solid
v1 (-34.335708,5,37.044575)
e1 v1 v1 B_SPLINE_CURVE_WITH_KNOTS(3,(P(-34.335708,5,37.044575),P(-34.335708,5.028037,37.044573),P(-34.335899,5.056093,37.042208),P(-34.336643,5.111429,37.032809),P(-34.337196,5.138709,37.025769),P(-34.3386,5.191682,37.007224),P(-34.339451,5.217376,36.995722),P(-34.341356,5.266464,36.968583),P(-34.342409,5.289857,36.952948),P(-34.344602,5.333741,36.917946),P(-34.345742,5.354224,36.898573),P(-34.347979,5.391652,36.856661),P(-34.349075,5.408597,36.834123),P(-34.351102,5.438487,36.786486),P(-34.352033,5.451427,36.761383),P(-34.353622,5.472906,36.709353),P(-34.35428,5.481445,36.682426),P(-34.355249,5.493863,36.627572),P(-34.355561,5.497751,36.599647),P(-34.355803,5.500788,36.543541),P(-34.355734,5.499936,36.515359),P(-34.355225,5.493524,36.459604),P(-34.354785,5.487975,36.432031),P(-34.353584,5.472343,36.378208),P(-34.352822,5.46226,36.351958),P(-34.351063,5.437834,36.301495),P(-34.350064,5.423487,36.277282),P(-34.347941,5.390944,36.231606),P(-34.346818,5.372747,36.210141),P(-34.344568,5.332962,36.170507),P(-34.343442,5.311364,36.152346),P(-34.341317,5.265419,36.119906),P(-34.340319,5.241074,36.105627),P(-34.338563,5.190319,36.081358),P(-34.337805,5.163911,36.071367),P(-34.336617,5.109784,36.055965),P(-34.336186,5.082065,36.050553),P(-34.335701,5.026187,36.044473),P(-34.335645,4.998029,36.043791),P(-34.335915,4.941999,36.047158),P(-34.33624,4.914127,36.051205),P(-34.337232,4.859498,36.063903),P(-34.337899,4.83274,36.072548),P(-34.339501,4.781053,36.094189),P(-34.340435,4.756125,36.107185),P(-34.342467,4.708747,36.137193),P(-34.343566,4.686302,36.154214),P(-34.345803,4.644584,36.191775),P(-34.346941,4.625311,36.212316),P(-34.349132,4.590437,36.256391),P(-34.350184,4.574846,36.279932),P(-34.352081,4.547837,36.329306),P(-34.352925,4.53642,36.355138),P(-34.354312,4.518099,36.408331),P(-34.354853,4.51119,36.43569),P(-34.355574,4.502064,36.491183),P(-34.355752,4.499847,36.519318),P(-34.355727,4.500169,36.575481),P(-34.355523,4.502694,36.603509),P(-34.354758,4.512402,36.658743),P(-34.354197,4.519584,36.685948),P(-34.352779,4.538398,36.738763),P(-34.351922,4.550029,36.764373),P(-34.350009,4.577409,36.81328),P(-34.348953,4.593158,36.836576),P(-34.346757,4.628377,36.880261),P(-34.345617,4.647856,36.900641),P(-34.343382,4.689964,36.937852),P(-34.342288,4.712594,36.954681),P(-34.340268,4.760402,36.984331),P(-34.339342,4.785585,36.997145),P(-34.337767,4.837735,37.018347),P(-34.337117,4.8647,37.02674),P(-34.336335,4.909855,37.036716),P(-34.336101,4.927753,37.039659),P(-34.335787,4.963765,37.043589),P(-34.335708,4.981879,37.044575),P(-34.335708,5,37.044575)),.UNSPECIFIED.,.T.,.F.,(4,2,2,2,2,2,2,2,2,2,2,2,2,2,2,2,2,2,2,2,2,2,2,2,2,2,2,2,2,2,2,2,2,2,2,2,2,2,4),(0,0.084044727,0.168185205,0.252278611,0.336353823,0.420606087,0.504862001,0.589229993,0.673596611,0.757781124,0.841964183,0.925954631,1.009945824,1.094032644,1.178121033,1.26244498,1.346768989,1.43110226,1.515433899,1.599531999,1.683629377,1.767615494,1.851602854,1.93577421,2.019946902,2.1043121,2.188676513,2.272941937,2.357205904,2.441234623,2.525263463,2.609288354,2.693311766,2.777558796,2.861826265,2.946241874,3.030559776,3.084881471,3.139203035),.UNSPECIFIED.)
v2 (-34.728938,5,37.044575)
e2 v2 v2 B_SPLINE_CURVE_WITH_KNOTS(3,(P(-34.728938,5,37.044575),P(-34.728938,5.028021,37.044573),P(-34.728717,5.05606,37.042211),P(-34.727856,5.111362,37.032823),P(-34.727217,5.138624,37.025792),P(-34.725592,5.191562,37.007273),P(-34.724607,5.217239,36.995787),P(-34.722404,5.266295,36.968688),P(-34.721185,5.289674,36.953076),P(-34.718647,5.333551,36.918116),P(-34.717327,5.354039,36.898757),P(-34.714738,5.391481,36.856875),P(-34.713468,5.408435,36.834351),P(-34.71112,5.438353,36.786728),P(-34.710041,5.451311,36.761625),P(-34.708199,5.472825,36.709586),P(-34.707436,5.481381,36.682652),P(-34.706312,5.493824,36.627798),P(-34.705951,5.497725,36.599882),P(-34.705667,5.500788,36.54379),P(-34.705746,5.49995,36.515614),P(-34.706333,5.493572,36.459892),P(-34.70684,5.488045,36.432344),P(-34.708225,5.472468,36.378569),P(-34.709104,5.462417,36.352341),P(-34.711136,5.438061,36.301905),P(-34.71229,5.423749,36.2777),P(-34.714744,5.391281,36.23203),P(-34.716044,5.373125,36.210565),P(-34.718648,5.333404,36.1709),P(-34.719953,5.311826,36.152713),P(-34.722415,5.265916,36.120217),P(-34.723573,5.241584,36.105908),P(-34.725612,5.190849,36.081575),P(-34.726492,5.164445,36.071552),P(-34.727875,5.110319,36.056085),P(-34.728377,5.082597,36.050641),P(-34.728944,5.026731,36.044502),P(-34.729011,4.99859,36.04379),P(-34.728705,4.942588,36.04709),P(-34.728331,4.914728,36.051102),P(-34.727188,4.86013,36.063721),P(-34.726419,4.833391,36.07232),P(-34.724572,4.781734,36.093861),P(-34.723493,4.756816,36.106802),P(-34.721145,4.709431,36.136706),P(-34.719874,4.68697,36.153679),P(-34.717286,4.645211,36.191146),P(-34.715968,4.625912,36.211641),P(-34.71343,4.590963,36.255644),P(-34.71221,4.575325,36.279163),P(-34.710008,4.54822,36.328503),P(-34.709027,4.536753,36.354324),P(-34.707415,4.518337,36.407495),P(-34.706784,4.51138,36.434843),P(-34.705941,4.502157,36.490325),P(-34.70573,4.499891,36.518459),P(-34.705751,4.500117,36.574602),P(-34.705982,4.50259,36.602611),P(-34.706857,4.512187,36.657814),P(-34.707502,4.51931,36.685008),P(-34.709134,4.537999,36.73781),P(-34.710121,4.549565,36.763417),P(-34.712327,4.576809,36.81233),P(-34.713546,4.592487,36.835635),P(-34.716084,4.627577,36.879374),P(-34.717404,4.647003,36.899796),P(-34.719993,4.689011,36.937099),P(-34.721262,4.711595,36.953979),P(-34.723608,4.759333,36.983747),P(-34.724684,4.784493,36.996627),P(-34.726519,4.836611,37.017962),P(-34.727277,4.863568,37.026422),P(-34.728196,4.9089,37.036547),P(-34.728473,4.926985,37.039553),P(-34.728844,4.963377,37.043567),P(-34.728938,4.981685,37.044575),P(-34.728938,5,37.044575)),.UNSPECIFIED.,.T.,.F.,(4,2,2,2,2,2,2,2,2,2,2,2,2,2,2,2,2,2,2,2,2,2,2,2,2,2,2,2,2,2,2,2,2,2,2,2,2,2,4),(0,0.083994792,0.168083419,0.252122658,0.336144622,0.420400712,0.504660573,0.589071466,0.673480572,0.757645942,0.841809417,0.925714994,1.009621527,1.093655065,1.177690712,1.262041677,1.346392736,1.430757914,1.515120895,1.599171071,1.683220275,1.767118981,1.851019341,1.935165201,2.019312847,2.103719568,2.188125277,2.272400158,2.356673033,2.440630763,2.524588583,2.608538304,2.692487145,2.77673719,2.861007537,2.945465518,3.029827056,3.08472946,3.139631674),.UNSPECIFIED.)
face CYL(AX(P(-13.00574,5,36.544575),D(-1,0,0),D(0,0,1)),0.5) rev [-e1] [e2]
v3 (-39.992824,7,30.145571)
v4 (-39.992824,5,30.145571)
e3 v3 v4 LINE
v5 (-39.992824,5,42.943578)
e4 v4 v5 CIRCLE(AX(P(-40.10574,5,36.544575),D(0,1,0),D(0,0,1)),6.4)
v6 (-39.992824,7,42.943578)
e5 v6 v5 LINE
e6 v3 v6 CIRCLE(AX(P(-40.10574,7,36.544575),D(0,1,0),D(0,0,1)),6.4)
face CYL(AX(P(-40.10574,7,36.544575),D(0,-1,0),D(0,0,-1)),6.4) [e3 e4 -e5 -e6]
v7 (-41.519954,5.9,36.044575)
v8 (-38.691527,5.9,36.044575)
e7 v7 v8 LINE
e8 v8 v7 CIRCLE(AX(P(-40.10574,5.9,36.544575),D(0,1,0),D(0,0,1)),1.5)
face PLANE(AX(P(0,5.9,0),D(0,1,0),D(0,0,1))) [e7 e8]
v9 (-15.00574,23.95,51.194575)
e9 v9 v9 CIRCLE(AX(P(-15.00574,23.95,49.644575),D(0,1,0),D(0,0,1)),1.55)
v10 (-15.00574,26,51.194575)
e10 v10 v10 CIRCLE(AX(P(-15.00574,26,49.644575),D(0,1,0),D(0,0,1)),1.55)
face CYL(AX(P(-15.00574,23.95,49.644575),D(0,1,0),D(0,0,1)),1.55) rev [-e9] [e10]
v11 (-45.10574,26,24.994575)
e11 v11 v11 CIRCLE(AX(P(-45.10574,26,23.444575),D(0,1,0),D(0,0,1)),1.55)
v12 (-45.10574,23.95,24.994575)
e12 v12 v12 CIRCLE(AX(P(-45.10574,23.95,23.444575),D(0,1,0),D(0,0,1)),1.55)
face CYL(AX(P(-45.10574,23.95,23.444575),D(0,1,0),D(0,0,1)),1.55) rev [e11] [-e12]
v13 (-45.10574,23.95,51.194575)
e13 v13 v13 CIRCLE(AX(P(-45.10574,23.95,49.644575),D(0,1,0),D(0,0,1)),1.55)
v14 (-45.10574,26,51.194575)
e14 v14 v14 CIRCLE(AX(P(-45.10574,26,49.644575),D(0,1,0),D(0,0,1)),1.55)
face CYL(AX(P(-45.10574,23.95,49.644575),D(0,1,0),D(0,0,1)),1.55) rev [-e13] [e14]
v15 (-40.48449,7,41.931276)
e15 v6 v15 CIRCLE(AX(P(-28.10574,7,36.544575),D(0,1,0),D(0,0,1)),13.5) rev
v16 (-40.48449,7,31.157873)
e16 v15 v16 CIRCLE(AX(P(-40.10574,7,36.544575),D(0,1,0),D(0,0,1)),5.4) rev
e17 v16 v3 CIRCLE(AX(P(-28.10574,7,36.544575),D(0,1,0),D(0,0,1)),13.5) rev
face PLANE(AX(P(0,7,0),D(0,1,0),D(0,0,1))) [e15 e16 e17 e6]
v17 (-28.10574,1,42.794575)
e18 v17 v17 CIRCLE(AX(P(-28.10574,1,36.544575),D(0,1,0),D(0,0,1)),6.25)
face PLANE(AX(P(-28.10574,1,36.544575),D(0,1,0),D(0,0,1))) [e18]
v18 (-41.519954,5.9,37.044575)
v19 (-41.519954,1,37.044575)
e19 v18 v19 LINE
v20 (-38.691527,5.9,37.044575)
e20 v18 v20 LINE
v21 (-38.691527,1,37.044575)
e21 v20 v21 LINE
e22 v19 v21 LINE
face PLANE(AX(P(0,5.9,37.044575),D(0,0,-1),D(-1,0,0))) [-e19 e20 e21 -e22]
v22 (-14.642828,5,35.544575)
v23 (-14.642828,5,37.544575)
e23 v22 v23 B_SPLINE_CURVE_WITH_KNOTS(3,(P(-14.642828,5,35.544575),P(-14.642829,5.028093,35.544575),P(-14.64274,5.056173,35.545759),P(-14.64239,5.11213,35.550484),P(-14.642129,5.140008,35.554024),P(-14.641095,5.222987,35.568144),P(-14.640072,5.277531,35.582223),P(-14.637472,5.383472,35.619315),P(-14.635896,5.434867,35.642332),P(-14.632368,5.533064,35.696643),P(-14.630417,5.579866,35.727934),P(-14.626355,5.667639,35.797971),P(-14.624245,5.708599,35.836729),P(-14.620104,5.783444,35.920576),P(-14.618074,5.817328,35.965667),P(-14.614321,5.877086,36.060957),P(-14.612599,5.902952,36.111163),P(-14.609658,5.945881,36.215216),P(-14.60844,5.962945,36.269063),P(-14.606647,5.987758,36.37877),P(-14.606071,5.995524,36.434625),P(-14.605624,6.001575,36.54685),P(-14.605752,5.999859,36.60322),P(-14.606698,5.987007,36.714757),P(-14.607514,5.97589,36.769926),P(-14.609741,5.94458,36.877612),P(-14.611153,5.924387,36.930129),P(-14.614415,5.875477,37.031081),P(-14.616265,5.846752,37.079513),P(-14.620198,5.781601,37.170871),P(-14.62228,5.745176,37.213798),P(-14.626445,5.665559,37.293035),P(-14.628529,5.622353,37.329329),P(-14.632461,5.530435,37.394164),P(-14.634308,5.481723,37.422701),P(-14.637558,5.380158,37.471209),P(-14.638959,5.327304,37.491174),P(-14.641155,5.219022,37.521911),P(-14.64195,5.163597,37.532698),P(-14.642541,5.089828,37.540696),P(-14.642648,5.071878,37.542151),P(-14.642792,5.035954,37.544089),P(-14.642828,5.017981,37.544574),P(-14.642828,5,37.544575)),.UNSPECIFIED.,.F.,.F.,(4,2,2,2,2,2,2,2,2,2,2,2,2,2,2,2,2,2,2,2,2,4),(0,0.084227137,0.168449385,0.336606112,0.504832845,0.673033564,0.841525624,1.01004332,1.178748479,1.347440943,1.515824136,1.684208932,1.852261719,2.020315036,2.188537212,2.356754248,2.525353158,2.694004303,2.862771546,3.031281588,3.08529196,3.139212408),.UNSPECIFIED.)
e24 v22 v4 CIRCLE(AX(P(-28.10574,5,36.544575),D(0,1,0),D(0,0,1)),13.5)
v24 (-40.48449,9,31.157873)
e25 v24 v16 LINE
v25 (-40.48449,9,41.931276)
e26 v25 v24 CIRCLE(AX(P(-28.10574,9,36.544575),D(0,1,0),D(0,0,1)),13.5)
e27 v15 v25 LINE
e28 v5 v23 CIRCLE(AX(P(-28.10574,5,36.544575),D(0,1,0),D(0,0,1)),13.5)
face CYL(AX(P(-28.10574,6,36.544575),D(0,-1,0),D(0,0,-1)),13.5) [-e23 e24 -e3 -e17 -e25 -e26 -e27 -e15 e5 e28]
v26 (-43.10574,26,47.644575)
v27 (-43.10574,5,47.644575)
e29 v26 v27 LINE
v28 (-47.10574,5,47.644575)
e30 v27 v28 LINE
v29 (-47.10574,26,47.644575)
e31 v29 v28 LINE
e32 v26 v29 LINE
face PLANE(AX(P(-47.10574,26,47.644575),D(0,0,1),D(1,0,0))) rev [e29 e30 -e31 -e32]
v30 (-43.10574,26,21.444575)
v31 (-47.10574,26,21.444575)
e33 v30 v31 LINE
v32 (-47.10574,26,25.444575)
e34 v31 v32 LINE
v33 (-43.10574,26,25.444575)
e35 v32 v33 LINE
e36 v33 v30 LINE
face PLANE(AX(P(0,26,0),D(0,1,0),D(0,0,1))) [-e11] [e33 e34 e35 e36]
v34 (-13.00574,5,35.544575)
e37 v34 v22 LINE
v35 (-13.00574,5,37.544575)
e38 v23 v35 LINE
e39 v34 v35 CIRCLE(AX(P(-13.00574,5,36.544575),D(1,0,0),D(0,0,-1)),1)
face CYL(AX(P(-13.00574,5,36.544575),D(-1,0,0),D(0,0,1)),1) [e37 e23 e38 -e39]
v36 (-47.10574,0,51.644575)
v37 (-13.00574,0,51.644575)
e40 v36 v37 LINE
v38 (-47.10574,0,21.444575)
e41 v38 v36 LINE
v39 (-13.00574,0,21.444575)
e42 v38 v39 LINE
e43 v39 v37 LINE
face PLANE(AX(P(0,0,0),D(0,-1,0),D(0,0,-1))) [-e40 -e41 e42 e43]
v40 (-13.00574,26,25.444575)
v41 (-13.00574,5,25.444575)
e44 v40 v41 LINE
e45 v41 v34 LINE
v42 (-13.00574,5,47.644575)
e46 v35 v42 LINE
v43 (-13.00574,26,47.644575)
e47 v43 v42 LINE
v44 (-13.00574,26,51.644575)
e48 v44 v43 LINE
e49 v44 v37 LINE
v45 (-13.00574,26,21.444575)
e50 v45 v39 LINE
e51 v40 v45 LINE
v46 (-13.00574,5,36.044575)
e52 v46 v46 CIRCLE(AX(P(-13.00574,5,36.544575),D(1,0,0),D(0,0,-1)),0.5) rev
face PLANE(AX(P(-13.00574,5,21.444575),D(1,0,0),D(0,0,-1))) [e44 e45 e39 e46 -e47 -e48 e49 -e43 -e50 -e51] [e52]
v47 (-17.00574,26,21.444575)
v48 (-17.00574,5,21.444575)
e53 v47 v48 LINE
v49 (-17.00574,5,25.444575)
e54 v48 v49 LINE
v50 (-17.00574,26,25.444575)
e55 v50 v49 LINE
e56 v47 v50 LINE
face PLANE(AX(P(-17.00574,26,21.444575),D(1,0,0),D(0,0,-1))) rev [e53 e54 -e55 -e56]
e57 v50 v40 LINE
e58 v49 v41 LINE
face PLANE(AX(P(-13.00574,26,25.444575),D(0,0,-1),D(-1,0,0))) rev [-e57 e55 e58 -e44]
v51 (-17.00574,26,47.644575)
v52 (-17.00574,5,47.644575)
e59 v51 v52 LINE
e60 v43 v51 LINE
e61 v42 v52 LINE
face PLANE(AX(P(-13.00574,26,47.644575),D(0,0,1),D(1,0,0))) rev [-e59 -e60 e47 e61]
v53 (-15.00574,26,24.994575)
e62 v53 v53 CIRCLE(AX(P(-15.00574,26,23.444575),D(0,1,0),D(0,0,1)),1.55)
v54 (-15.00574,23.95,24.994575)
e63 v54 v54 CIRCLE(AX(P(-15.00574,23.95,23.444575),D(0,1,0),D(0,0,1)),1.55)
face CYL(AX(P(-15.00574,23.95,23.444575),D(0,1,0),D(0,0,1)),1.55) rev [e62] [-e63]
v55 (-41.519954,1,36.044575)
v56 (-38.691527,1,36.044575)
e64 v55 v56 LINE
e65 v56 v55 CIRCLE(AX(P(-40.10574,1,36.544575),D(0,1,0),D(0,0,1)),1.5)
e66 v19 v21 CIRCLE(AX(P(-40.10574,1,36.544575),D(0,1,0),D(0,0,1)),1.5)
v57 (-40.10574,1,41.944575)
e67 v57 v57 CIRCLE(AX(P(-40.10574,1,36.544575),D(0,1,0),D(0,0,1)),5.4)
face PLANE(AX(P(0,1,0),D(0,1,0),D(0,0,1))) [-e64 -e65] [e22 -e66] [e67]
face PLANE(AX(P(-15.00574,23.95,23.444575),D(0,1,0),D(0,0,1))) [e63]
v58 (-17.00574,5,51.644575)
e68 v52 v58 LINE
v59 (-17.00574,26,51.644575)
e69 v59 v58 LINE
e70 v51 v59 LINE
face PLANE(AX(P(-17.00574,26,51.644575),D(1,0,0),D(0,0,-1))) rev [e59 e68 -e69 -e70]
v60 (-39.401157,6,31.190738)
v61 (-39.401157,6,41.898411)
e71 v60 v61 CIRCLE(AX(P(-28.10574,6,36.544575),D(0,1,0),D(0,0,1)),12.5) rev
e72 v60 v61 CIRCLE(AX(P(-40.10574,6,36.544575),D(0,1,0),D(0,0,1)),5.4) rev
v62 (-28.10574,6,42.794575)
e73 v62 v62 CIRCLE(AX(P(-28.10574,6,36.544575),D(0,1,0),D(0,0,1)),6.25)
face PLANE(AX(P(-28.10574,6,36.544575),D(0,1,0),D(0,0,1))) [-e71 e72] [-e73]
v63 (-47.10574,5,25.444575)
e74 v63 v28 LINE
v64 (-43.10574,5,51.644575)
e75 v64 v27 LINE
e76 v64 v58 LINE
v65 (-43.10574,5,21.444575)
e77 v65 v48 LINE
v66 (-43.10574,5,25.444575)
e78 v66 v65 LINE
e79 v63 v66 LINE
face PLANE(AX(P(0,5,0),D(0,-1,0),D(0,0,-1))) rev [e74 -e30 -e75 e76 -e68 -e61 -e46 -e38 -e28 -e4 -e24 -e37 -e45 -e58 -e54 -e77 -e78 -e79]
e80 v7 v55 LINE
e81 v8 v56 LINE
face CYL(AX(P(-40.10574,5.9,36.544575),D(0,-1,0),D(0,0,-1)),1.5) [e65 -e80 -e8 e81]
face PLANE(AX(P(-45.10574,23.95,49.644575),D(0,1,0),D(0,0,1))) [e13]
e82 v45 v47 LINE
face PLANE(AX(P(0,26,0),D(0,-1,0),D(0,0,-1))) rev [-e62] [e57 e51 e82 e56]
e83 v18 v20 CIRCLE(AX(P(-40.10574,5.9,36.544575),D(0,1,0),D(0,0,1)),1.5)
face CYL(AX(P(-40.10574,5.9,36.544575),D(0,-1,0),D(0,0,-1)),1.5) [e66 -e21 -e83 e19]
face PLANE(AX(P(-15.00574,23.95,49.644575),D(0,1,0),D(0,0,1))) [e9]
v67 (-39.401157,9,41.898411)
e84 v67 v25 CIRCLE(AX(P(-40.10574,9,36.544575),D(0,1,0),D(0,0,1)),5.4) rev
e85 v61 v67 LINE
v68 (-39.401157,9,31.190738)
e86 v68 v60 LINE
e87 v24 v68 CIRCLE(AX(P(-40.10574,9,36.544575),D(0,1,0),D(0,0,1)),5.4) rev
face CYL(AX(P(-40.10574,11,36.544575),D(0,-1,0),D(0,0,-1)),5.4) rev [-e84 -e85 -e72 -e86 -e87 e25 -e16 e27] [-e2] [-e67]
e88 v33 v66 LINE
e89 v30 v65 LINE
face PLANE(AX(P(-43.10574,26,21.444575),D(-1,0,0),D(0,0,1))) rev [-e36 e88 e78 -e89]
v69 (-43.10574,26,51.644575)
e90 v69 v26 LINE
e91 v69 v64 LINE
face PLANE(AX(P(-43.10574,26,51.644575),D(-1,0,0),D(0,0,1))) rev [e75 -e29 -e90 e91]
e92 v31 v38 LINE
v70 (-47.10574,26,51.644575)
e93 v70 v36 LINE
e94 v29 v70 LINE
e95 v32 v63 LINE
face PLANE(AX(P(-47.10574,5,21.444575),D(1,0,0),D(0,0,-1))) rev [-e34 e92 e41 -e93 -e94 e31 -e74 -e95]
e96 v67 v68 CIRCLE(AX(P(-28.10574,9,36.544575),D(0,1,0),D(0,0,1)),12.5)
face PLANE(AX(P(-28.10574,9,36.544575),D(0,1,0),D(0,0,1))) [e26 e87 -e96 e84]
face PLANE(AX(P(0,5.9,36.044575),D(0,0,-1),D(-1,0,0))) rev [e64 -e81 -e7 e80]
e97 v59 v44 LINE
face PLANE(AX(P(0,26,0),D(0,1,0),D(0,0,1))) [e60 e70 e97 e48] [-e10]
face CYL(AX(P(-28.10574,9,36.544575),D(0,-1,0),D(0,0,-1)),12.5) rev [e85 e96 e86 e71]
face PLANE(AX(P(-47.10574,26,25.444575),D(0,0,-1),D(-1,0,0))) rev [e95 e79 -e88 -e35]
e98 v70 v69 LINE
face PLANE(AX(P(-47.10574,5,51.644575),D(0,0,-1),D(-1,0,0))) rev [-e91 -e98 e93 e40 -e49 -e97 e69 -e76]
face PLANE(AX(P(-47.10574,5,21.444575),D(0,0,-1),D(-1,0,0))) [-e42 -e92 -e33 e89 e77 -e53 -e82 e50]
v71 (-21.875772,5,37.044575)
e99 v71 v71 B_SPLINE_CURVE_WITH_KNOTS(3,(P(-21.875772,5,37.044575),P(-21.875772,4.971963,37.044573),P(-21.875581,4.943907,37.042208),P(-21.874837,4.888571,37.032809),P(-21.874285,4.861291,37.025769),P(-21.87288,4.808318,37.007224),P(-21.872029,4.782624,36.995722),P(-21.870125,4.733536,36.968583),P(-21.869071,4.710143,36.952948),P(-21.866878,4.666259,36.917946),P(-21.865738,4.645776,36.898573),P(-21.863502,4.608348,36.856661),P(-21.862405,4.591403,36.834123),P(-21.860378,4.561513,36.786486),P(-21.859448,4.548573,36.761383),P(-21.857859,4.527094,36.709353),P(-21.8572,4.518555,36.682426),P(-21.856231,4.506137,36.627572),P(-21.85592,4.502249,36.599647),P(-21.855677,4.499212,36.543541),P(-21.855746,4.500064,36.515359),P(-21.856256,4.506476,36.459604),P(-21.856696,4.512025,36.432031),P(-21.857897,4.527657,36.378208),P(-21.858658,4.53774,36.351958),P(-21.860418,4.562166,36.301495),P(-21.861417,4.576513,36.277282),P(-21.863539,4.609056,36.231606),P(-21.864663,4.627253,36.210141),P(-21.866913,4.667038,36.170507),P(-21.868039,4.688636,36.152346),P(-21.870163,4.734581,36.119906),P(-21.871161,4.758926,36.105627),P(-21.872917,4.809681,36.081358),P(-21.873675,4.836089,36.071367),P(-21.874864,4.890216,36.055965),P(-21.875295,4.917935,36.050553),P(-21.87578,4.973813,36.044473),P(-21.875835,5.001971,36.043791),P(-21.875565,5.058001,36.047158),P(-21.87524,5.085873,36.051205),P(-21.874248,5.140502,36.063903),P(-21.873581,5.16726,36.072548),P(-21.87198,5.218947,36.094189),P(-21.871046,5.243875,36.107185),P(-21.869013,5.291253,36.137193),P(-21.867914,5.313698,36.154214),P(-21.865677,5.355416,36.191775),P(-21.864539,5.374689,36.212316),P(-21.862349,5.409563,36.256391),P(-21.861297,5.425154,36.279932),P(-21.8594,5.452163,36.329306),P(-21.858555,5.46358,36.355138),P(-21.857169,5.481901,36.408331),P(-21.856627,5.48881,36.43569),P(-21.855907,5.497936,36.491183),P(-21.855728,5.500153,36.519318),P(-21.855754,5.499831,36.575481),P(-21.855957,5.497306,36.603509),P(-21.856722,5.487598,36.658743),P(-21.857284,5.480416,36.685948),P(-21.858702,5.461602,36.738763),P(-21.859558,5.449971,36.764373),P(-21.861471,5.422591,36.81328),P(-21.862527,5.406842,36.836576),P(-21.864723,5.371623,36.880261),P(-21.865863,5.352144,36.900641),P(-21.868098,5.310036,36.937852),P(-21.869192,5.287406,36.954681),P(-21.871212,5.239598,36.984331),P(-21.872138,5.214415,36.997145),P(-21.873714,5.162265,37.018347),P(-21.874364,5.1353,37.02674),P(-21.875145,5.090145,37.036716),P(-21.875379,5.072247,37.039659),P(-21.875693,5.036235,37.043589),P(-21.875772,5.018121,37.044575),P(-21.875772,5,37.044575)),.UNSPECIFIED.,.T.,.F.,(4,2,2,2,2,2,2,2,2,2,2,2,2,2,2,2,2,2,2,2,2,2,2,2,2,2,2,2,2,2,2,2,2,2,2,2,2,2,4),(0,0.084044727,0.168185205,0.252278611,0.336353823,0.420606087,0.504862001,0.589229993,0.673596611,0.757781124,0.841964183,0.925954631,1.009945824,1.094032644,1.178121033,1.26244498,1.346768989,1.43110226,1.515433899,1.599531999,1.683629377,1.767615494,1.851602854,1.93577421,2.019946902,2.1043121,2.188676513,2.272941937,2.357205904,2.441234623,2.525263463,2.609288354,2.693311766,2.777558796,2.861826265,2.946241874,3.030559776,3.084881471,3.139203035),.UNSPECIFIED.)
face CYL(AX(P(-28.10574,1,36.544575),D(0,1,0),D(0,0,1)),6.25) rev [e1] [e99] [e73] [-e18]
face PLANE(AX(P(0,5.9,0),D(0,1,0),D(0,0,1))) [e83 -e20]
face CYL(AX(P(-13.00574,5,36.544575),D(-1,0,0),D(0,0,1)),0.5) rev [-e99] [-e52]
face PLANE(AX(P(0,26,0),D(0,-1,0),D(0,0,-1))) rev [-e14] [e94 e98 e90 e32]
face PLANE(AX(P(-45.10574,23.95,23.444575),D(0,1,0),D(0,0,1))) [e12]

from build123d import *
from build123d.topology import SkipClean

# Parameters (mm, degrees)
SKETCH1_W               = 34.1
SKETCH1_H               = 30.2
BOSS_EXTRUDE1_DEPTH     = 5
SKETCH2_R               = 13.5
BOSS_EXTRUDE2_DEPTH     = 1
SKETCH3_R               = 13.5
SKETCH3_R_2             = 12.5
BOSS_EXTRUDE3_DEPTH     = 3
SKETCH4_R               = 6.25
CUT_EXTRUDE2_DEPTH      = 5
CUT_EXTRUDE3_DEPTH      = 5
CUT_EXTRUDE3_DEPTH_BACK = 5
SKETCH6_R               = 5.4
BOSS_EXTRUDE4_DEPTH     = 2
BOSS_EXTRUDE5_DEPTH     = 4.9
SKETCH10_R              = 1
SKETCH10_R_2            = 0.5
CUT_SWEEP1_START        = -34.728938274
CUT_SWEEP1_OUTLINE_R    = 0.5
CUT_SWEEP1_DEPTH        = 21.723198077
CUT_EXTRUDE4_START      = 5
SKETCH13_R              = 6.25
CUT_EXTRUDE4_DEPTH      = 5
SKETCH14_W              = 4
SKETCH14_H              = 4
BOSS_EXTRUDE6_DEPTH     = 21
SKETCH15_R              = 1.55
CUT_EXTRUDE5_DEPTH      = 2.05


# Read off the part's stored shape, not the designer's step: Cut-Sweep1
with BuildPart() as part:
    # Sketch1 → Boss-Extrude1 (new body)
    with BuildSketch(Plane(origin=(0, 0, 0), x_dir=(1, 0, 0), z_dir=(0, 1, 0))):
        with Locations((-30.055740197, -36.544574539)):
            Rectangle(SKETCH1_W, SKETCH1_H)
    extrude(amount=BOSS_EXTRUDE1_DEPTH)

    # Sketch2 → Boss-Extrude2 (add)
    with BuildSketch(Plane(origin=(0, 5, 0), x_dir=(1, 0, 0), z_dir=(0, 1, 0))):
        with Locations(Location((-28.105740197, -36.544574539, 0), (0, 0, 270))):
            Circle(SKETCH2_R)
    extrude(amount=BOSS_EXTRUDE2_DEPTH)

    # Sketch3 → Boss-Extrude3 (add)
    with BuildSketch(Plane(origin=(0, 6, 0), x_dir=(1, 0, 0), z_dir=(0, 1, 0))):
        with Locations(Location((-28.105740197, -36.544574539, 0), (0, 0, 270))):
            Circle(SKETCH3_R)
        with Locations(Location((-28.105740197, -36.544574539, 0), (0, 0, 270))):
            Circle(SKETCH3_R_2, mode=Mode.SUBTRACT)
    extrude(amount=BOSS_EXTRUDE3_DEPTH)

    # Sketch4 → Cut-Extrude2 (cut)
    with BuildSketch(Plane(origin=(0, 6, 0), x_dir=(1, 0, 0), z_dir=(0, 1, 0))):
        with Locations(Location((-28.105740197, -36.544574539, 0), (0, 0, 270))):
            Circle(SKETCH4_R)
    extrude(amount=-CUT_EXTRUDE2_DEPTH, mode=Mode.SUBTRACT)

    # Sketch6 → Cut-Extrude3 (cut, two sides: drawn at the far end of the back side and taken through both)
    with BuildSketch(Plane(origin=(0, 6, 0), x_dir=(1, 0, 0), z_dir=(0, 1, 0)).offset(-CUT_EXTRUDE3_DEPTH_BACK)):
        with Locations(Location((-40.105740197, -36.544574539, 0), (0, 0, 94.021964573))):
            Circle(SKETCH6_R)
    extrude(amount=CUT_EXTRUDE3_DEPTH + CUT_EXTRUDE3_DEPTH_BACK, mode=Mode.SUBTRACT)

    # Sketch7 → Boss-Extrude4 (add)
    with BuildSketch(Plane(origin=(0, 5, 0), x_dir=(1, 0, 0), z_dir=(0, 1, 0))):
        with BuildLine():
            ThreePointArc((-40.484490197, -41.931275611), (-45.505740197, -36.544574539), (-40.484490197, -31.157873467))
            ThreePointArc((-40.484490197, -31.157873467), (-40.249209884, -30.646596585), (-39.99282353, -30.145570724))
            ThreePointArc((-39.99282353, -30.145570724), (-46.505740197, -36.544574539), (-39.99282353, -42.943578354))
            ThreePointArc((-39.99282353, -42.943578354), (-40.249209884, -42.442552493), (-40.484490197, -41.931275611))
        make_face()
    extrude(amount=BOSS_EXTRUDE4_DEPTH)

    # Sketch9 → Boss-Extrude5 (add)
    with BuildSketch(Plane(origin=(0, 1, 0), x_dir=(1, 0, 0), z_dir=(0, 1, 0))):
        with BuildLine():
            Line((-38.691526635, -37.044574539), (-41.519953759, -37.044574539))
            ThreePointArc((-41.519953759, -37.044574539), (-40.105740197, -38.044574539), (-38.691526635, -37.044574539))
        make_face()
        with BuildLine():
            ThreePointArc((-38.691526635, -36.044574539), (-40.105740197, -35.044574539), (-41.519953759, -36.044574539))
            Line((-41.519953759, -36.044574539), (-38.691526635, -36.044574539))
        make_face()
    extrude(amount=BOSS_EXTRUDE5_DEPTH)

    # Sweep1: sweep along a path in Sketch11
    with BuildLine(Plane(origin=(0, 5, 0), x_dir=(1, 0, 0), z_dir=(0, 1, 0))) as sweep1_path:
        Line((-13.005740197, -36.544574539), (-34.705740197, -36.544574539))
    # Sketch10 → Sweep1 (sweep)
    with BuildSketch(Plane(origin=(-13.005740197, 0, 0), x_dir=(0, 0, -1), z_dir=(1, 0, 0))):
        with Locations((-36.544574539, 5)):
            Circle(SKETCH10_R)
        with Locations((-36.544574539, 5)):
            Circle(SKETCH10_R_2, mode=Mode.SUBTRACT)
    sweep(path=sweep1_path.line)

    # Cut-Sweep1 outline → Cut-Sweep1 (cut)
    with SkipClean():  # the faces are left unmerged after this step: merging them gives an invalid solid
        with BuildSketch(Plane.YZ.offset(CUT_SWEEP1_START)):
            with Locations((5, 36.544574539)):
                Circle(CUT_SWEEP1_OUTLINE_R)
        extrude(amount=CUT_SWEEP1_DEPTH, mode=Mode.SUBTRACT)
    add(part.part.scale(1), mode=Mode.REPLACE)  # the faces are merged on a copy

    # Sketch13 → Cut-Extrude4 (cut)
    with BuildSketch(Plane(origin=(0, 1, 0), x_dir=(1, 0, 0), z_dir=(0, 1, 0)).offset(CUT_EXTRUDE4_START)):
        with Locations(Location((-28.105740197, -36.544574539, 0), (0, 0, 270))):
            Circle(SKETCH13_R)
    extrude(amount=-CUT_EXTRUDE4_DEPTH, mode=Mode.SUBTRACT)

    # Sketch14 → Boss-Extrude6 (add)
    with BuildSketch(Plane(origin=(0, 5, 0), x_dir=(1, 0, 0), z_dir=(0, 1, 0))):
        with Locations((-45.105740197, -23.444574539)):
            Rectangle(SKETCH14_W, SKETCH14_H)
        with Locations((-45.105740197, -49.644574539)):
            Rectangle(SKETCH14_W, SKETCH14_H)
        with Locations((-15.005740197, -49.644574539)):
            Rectangle(SKETCH14_W, SKETCH14_H)
        with Locations((-15.005740197, -23.444574539)):
            Rectangle(SKETCH14_W, SKETCH14_H)
    extrude(amount=BOSS_EXTRUDE6_DEPTH)

    # Sketch15 → Cut-Extrude5 (cut)
    with BuildSketch(Plane(origin=(0, 26, 0), x_dir=(1, 0, 0), z_dir=(0, 1, 0))):
        with Locations(Location((-45.105740197, -49.644574539, 0), (0, 0, 270))):
            Circle(SKETCH15_R)
        with Locations(Location((-45.105740197, -23.444574539, 0), (0, 0, 270))):
            Circle(SKETCH15_R)
        with Locations(Location((-15.005740197, -23.444574539, 0), (0, 0, 270))):
            Circle(SKETCH15_R)
        with Locations(Location((-15.005740197, -49.644574539, 0), (0, 0, 270))):
            Circle(SKETCH15_R)
    extrude(amount=-CUT_EXTRUDE5_DEPTH, mode=Mode.SUBTRACT)


solid = part.part
